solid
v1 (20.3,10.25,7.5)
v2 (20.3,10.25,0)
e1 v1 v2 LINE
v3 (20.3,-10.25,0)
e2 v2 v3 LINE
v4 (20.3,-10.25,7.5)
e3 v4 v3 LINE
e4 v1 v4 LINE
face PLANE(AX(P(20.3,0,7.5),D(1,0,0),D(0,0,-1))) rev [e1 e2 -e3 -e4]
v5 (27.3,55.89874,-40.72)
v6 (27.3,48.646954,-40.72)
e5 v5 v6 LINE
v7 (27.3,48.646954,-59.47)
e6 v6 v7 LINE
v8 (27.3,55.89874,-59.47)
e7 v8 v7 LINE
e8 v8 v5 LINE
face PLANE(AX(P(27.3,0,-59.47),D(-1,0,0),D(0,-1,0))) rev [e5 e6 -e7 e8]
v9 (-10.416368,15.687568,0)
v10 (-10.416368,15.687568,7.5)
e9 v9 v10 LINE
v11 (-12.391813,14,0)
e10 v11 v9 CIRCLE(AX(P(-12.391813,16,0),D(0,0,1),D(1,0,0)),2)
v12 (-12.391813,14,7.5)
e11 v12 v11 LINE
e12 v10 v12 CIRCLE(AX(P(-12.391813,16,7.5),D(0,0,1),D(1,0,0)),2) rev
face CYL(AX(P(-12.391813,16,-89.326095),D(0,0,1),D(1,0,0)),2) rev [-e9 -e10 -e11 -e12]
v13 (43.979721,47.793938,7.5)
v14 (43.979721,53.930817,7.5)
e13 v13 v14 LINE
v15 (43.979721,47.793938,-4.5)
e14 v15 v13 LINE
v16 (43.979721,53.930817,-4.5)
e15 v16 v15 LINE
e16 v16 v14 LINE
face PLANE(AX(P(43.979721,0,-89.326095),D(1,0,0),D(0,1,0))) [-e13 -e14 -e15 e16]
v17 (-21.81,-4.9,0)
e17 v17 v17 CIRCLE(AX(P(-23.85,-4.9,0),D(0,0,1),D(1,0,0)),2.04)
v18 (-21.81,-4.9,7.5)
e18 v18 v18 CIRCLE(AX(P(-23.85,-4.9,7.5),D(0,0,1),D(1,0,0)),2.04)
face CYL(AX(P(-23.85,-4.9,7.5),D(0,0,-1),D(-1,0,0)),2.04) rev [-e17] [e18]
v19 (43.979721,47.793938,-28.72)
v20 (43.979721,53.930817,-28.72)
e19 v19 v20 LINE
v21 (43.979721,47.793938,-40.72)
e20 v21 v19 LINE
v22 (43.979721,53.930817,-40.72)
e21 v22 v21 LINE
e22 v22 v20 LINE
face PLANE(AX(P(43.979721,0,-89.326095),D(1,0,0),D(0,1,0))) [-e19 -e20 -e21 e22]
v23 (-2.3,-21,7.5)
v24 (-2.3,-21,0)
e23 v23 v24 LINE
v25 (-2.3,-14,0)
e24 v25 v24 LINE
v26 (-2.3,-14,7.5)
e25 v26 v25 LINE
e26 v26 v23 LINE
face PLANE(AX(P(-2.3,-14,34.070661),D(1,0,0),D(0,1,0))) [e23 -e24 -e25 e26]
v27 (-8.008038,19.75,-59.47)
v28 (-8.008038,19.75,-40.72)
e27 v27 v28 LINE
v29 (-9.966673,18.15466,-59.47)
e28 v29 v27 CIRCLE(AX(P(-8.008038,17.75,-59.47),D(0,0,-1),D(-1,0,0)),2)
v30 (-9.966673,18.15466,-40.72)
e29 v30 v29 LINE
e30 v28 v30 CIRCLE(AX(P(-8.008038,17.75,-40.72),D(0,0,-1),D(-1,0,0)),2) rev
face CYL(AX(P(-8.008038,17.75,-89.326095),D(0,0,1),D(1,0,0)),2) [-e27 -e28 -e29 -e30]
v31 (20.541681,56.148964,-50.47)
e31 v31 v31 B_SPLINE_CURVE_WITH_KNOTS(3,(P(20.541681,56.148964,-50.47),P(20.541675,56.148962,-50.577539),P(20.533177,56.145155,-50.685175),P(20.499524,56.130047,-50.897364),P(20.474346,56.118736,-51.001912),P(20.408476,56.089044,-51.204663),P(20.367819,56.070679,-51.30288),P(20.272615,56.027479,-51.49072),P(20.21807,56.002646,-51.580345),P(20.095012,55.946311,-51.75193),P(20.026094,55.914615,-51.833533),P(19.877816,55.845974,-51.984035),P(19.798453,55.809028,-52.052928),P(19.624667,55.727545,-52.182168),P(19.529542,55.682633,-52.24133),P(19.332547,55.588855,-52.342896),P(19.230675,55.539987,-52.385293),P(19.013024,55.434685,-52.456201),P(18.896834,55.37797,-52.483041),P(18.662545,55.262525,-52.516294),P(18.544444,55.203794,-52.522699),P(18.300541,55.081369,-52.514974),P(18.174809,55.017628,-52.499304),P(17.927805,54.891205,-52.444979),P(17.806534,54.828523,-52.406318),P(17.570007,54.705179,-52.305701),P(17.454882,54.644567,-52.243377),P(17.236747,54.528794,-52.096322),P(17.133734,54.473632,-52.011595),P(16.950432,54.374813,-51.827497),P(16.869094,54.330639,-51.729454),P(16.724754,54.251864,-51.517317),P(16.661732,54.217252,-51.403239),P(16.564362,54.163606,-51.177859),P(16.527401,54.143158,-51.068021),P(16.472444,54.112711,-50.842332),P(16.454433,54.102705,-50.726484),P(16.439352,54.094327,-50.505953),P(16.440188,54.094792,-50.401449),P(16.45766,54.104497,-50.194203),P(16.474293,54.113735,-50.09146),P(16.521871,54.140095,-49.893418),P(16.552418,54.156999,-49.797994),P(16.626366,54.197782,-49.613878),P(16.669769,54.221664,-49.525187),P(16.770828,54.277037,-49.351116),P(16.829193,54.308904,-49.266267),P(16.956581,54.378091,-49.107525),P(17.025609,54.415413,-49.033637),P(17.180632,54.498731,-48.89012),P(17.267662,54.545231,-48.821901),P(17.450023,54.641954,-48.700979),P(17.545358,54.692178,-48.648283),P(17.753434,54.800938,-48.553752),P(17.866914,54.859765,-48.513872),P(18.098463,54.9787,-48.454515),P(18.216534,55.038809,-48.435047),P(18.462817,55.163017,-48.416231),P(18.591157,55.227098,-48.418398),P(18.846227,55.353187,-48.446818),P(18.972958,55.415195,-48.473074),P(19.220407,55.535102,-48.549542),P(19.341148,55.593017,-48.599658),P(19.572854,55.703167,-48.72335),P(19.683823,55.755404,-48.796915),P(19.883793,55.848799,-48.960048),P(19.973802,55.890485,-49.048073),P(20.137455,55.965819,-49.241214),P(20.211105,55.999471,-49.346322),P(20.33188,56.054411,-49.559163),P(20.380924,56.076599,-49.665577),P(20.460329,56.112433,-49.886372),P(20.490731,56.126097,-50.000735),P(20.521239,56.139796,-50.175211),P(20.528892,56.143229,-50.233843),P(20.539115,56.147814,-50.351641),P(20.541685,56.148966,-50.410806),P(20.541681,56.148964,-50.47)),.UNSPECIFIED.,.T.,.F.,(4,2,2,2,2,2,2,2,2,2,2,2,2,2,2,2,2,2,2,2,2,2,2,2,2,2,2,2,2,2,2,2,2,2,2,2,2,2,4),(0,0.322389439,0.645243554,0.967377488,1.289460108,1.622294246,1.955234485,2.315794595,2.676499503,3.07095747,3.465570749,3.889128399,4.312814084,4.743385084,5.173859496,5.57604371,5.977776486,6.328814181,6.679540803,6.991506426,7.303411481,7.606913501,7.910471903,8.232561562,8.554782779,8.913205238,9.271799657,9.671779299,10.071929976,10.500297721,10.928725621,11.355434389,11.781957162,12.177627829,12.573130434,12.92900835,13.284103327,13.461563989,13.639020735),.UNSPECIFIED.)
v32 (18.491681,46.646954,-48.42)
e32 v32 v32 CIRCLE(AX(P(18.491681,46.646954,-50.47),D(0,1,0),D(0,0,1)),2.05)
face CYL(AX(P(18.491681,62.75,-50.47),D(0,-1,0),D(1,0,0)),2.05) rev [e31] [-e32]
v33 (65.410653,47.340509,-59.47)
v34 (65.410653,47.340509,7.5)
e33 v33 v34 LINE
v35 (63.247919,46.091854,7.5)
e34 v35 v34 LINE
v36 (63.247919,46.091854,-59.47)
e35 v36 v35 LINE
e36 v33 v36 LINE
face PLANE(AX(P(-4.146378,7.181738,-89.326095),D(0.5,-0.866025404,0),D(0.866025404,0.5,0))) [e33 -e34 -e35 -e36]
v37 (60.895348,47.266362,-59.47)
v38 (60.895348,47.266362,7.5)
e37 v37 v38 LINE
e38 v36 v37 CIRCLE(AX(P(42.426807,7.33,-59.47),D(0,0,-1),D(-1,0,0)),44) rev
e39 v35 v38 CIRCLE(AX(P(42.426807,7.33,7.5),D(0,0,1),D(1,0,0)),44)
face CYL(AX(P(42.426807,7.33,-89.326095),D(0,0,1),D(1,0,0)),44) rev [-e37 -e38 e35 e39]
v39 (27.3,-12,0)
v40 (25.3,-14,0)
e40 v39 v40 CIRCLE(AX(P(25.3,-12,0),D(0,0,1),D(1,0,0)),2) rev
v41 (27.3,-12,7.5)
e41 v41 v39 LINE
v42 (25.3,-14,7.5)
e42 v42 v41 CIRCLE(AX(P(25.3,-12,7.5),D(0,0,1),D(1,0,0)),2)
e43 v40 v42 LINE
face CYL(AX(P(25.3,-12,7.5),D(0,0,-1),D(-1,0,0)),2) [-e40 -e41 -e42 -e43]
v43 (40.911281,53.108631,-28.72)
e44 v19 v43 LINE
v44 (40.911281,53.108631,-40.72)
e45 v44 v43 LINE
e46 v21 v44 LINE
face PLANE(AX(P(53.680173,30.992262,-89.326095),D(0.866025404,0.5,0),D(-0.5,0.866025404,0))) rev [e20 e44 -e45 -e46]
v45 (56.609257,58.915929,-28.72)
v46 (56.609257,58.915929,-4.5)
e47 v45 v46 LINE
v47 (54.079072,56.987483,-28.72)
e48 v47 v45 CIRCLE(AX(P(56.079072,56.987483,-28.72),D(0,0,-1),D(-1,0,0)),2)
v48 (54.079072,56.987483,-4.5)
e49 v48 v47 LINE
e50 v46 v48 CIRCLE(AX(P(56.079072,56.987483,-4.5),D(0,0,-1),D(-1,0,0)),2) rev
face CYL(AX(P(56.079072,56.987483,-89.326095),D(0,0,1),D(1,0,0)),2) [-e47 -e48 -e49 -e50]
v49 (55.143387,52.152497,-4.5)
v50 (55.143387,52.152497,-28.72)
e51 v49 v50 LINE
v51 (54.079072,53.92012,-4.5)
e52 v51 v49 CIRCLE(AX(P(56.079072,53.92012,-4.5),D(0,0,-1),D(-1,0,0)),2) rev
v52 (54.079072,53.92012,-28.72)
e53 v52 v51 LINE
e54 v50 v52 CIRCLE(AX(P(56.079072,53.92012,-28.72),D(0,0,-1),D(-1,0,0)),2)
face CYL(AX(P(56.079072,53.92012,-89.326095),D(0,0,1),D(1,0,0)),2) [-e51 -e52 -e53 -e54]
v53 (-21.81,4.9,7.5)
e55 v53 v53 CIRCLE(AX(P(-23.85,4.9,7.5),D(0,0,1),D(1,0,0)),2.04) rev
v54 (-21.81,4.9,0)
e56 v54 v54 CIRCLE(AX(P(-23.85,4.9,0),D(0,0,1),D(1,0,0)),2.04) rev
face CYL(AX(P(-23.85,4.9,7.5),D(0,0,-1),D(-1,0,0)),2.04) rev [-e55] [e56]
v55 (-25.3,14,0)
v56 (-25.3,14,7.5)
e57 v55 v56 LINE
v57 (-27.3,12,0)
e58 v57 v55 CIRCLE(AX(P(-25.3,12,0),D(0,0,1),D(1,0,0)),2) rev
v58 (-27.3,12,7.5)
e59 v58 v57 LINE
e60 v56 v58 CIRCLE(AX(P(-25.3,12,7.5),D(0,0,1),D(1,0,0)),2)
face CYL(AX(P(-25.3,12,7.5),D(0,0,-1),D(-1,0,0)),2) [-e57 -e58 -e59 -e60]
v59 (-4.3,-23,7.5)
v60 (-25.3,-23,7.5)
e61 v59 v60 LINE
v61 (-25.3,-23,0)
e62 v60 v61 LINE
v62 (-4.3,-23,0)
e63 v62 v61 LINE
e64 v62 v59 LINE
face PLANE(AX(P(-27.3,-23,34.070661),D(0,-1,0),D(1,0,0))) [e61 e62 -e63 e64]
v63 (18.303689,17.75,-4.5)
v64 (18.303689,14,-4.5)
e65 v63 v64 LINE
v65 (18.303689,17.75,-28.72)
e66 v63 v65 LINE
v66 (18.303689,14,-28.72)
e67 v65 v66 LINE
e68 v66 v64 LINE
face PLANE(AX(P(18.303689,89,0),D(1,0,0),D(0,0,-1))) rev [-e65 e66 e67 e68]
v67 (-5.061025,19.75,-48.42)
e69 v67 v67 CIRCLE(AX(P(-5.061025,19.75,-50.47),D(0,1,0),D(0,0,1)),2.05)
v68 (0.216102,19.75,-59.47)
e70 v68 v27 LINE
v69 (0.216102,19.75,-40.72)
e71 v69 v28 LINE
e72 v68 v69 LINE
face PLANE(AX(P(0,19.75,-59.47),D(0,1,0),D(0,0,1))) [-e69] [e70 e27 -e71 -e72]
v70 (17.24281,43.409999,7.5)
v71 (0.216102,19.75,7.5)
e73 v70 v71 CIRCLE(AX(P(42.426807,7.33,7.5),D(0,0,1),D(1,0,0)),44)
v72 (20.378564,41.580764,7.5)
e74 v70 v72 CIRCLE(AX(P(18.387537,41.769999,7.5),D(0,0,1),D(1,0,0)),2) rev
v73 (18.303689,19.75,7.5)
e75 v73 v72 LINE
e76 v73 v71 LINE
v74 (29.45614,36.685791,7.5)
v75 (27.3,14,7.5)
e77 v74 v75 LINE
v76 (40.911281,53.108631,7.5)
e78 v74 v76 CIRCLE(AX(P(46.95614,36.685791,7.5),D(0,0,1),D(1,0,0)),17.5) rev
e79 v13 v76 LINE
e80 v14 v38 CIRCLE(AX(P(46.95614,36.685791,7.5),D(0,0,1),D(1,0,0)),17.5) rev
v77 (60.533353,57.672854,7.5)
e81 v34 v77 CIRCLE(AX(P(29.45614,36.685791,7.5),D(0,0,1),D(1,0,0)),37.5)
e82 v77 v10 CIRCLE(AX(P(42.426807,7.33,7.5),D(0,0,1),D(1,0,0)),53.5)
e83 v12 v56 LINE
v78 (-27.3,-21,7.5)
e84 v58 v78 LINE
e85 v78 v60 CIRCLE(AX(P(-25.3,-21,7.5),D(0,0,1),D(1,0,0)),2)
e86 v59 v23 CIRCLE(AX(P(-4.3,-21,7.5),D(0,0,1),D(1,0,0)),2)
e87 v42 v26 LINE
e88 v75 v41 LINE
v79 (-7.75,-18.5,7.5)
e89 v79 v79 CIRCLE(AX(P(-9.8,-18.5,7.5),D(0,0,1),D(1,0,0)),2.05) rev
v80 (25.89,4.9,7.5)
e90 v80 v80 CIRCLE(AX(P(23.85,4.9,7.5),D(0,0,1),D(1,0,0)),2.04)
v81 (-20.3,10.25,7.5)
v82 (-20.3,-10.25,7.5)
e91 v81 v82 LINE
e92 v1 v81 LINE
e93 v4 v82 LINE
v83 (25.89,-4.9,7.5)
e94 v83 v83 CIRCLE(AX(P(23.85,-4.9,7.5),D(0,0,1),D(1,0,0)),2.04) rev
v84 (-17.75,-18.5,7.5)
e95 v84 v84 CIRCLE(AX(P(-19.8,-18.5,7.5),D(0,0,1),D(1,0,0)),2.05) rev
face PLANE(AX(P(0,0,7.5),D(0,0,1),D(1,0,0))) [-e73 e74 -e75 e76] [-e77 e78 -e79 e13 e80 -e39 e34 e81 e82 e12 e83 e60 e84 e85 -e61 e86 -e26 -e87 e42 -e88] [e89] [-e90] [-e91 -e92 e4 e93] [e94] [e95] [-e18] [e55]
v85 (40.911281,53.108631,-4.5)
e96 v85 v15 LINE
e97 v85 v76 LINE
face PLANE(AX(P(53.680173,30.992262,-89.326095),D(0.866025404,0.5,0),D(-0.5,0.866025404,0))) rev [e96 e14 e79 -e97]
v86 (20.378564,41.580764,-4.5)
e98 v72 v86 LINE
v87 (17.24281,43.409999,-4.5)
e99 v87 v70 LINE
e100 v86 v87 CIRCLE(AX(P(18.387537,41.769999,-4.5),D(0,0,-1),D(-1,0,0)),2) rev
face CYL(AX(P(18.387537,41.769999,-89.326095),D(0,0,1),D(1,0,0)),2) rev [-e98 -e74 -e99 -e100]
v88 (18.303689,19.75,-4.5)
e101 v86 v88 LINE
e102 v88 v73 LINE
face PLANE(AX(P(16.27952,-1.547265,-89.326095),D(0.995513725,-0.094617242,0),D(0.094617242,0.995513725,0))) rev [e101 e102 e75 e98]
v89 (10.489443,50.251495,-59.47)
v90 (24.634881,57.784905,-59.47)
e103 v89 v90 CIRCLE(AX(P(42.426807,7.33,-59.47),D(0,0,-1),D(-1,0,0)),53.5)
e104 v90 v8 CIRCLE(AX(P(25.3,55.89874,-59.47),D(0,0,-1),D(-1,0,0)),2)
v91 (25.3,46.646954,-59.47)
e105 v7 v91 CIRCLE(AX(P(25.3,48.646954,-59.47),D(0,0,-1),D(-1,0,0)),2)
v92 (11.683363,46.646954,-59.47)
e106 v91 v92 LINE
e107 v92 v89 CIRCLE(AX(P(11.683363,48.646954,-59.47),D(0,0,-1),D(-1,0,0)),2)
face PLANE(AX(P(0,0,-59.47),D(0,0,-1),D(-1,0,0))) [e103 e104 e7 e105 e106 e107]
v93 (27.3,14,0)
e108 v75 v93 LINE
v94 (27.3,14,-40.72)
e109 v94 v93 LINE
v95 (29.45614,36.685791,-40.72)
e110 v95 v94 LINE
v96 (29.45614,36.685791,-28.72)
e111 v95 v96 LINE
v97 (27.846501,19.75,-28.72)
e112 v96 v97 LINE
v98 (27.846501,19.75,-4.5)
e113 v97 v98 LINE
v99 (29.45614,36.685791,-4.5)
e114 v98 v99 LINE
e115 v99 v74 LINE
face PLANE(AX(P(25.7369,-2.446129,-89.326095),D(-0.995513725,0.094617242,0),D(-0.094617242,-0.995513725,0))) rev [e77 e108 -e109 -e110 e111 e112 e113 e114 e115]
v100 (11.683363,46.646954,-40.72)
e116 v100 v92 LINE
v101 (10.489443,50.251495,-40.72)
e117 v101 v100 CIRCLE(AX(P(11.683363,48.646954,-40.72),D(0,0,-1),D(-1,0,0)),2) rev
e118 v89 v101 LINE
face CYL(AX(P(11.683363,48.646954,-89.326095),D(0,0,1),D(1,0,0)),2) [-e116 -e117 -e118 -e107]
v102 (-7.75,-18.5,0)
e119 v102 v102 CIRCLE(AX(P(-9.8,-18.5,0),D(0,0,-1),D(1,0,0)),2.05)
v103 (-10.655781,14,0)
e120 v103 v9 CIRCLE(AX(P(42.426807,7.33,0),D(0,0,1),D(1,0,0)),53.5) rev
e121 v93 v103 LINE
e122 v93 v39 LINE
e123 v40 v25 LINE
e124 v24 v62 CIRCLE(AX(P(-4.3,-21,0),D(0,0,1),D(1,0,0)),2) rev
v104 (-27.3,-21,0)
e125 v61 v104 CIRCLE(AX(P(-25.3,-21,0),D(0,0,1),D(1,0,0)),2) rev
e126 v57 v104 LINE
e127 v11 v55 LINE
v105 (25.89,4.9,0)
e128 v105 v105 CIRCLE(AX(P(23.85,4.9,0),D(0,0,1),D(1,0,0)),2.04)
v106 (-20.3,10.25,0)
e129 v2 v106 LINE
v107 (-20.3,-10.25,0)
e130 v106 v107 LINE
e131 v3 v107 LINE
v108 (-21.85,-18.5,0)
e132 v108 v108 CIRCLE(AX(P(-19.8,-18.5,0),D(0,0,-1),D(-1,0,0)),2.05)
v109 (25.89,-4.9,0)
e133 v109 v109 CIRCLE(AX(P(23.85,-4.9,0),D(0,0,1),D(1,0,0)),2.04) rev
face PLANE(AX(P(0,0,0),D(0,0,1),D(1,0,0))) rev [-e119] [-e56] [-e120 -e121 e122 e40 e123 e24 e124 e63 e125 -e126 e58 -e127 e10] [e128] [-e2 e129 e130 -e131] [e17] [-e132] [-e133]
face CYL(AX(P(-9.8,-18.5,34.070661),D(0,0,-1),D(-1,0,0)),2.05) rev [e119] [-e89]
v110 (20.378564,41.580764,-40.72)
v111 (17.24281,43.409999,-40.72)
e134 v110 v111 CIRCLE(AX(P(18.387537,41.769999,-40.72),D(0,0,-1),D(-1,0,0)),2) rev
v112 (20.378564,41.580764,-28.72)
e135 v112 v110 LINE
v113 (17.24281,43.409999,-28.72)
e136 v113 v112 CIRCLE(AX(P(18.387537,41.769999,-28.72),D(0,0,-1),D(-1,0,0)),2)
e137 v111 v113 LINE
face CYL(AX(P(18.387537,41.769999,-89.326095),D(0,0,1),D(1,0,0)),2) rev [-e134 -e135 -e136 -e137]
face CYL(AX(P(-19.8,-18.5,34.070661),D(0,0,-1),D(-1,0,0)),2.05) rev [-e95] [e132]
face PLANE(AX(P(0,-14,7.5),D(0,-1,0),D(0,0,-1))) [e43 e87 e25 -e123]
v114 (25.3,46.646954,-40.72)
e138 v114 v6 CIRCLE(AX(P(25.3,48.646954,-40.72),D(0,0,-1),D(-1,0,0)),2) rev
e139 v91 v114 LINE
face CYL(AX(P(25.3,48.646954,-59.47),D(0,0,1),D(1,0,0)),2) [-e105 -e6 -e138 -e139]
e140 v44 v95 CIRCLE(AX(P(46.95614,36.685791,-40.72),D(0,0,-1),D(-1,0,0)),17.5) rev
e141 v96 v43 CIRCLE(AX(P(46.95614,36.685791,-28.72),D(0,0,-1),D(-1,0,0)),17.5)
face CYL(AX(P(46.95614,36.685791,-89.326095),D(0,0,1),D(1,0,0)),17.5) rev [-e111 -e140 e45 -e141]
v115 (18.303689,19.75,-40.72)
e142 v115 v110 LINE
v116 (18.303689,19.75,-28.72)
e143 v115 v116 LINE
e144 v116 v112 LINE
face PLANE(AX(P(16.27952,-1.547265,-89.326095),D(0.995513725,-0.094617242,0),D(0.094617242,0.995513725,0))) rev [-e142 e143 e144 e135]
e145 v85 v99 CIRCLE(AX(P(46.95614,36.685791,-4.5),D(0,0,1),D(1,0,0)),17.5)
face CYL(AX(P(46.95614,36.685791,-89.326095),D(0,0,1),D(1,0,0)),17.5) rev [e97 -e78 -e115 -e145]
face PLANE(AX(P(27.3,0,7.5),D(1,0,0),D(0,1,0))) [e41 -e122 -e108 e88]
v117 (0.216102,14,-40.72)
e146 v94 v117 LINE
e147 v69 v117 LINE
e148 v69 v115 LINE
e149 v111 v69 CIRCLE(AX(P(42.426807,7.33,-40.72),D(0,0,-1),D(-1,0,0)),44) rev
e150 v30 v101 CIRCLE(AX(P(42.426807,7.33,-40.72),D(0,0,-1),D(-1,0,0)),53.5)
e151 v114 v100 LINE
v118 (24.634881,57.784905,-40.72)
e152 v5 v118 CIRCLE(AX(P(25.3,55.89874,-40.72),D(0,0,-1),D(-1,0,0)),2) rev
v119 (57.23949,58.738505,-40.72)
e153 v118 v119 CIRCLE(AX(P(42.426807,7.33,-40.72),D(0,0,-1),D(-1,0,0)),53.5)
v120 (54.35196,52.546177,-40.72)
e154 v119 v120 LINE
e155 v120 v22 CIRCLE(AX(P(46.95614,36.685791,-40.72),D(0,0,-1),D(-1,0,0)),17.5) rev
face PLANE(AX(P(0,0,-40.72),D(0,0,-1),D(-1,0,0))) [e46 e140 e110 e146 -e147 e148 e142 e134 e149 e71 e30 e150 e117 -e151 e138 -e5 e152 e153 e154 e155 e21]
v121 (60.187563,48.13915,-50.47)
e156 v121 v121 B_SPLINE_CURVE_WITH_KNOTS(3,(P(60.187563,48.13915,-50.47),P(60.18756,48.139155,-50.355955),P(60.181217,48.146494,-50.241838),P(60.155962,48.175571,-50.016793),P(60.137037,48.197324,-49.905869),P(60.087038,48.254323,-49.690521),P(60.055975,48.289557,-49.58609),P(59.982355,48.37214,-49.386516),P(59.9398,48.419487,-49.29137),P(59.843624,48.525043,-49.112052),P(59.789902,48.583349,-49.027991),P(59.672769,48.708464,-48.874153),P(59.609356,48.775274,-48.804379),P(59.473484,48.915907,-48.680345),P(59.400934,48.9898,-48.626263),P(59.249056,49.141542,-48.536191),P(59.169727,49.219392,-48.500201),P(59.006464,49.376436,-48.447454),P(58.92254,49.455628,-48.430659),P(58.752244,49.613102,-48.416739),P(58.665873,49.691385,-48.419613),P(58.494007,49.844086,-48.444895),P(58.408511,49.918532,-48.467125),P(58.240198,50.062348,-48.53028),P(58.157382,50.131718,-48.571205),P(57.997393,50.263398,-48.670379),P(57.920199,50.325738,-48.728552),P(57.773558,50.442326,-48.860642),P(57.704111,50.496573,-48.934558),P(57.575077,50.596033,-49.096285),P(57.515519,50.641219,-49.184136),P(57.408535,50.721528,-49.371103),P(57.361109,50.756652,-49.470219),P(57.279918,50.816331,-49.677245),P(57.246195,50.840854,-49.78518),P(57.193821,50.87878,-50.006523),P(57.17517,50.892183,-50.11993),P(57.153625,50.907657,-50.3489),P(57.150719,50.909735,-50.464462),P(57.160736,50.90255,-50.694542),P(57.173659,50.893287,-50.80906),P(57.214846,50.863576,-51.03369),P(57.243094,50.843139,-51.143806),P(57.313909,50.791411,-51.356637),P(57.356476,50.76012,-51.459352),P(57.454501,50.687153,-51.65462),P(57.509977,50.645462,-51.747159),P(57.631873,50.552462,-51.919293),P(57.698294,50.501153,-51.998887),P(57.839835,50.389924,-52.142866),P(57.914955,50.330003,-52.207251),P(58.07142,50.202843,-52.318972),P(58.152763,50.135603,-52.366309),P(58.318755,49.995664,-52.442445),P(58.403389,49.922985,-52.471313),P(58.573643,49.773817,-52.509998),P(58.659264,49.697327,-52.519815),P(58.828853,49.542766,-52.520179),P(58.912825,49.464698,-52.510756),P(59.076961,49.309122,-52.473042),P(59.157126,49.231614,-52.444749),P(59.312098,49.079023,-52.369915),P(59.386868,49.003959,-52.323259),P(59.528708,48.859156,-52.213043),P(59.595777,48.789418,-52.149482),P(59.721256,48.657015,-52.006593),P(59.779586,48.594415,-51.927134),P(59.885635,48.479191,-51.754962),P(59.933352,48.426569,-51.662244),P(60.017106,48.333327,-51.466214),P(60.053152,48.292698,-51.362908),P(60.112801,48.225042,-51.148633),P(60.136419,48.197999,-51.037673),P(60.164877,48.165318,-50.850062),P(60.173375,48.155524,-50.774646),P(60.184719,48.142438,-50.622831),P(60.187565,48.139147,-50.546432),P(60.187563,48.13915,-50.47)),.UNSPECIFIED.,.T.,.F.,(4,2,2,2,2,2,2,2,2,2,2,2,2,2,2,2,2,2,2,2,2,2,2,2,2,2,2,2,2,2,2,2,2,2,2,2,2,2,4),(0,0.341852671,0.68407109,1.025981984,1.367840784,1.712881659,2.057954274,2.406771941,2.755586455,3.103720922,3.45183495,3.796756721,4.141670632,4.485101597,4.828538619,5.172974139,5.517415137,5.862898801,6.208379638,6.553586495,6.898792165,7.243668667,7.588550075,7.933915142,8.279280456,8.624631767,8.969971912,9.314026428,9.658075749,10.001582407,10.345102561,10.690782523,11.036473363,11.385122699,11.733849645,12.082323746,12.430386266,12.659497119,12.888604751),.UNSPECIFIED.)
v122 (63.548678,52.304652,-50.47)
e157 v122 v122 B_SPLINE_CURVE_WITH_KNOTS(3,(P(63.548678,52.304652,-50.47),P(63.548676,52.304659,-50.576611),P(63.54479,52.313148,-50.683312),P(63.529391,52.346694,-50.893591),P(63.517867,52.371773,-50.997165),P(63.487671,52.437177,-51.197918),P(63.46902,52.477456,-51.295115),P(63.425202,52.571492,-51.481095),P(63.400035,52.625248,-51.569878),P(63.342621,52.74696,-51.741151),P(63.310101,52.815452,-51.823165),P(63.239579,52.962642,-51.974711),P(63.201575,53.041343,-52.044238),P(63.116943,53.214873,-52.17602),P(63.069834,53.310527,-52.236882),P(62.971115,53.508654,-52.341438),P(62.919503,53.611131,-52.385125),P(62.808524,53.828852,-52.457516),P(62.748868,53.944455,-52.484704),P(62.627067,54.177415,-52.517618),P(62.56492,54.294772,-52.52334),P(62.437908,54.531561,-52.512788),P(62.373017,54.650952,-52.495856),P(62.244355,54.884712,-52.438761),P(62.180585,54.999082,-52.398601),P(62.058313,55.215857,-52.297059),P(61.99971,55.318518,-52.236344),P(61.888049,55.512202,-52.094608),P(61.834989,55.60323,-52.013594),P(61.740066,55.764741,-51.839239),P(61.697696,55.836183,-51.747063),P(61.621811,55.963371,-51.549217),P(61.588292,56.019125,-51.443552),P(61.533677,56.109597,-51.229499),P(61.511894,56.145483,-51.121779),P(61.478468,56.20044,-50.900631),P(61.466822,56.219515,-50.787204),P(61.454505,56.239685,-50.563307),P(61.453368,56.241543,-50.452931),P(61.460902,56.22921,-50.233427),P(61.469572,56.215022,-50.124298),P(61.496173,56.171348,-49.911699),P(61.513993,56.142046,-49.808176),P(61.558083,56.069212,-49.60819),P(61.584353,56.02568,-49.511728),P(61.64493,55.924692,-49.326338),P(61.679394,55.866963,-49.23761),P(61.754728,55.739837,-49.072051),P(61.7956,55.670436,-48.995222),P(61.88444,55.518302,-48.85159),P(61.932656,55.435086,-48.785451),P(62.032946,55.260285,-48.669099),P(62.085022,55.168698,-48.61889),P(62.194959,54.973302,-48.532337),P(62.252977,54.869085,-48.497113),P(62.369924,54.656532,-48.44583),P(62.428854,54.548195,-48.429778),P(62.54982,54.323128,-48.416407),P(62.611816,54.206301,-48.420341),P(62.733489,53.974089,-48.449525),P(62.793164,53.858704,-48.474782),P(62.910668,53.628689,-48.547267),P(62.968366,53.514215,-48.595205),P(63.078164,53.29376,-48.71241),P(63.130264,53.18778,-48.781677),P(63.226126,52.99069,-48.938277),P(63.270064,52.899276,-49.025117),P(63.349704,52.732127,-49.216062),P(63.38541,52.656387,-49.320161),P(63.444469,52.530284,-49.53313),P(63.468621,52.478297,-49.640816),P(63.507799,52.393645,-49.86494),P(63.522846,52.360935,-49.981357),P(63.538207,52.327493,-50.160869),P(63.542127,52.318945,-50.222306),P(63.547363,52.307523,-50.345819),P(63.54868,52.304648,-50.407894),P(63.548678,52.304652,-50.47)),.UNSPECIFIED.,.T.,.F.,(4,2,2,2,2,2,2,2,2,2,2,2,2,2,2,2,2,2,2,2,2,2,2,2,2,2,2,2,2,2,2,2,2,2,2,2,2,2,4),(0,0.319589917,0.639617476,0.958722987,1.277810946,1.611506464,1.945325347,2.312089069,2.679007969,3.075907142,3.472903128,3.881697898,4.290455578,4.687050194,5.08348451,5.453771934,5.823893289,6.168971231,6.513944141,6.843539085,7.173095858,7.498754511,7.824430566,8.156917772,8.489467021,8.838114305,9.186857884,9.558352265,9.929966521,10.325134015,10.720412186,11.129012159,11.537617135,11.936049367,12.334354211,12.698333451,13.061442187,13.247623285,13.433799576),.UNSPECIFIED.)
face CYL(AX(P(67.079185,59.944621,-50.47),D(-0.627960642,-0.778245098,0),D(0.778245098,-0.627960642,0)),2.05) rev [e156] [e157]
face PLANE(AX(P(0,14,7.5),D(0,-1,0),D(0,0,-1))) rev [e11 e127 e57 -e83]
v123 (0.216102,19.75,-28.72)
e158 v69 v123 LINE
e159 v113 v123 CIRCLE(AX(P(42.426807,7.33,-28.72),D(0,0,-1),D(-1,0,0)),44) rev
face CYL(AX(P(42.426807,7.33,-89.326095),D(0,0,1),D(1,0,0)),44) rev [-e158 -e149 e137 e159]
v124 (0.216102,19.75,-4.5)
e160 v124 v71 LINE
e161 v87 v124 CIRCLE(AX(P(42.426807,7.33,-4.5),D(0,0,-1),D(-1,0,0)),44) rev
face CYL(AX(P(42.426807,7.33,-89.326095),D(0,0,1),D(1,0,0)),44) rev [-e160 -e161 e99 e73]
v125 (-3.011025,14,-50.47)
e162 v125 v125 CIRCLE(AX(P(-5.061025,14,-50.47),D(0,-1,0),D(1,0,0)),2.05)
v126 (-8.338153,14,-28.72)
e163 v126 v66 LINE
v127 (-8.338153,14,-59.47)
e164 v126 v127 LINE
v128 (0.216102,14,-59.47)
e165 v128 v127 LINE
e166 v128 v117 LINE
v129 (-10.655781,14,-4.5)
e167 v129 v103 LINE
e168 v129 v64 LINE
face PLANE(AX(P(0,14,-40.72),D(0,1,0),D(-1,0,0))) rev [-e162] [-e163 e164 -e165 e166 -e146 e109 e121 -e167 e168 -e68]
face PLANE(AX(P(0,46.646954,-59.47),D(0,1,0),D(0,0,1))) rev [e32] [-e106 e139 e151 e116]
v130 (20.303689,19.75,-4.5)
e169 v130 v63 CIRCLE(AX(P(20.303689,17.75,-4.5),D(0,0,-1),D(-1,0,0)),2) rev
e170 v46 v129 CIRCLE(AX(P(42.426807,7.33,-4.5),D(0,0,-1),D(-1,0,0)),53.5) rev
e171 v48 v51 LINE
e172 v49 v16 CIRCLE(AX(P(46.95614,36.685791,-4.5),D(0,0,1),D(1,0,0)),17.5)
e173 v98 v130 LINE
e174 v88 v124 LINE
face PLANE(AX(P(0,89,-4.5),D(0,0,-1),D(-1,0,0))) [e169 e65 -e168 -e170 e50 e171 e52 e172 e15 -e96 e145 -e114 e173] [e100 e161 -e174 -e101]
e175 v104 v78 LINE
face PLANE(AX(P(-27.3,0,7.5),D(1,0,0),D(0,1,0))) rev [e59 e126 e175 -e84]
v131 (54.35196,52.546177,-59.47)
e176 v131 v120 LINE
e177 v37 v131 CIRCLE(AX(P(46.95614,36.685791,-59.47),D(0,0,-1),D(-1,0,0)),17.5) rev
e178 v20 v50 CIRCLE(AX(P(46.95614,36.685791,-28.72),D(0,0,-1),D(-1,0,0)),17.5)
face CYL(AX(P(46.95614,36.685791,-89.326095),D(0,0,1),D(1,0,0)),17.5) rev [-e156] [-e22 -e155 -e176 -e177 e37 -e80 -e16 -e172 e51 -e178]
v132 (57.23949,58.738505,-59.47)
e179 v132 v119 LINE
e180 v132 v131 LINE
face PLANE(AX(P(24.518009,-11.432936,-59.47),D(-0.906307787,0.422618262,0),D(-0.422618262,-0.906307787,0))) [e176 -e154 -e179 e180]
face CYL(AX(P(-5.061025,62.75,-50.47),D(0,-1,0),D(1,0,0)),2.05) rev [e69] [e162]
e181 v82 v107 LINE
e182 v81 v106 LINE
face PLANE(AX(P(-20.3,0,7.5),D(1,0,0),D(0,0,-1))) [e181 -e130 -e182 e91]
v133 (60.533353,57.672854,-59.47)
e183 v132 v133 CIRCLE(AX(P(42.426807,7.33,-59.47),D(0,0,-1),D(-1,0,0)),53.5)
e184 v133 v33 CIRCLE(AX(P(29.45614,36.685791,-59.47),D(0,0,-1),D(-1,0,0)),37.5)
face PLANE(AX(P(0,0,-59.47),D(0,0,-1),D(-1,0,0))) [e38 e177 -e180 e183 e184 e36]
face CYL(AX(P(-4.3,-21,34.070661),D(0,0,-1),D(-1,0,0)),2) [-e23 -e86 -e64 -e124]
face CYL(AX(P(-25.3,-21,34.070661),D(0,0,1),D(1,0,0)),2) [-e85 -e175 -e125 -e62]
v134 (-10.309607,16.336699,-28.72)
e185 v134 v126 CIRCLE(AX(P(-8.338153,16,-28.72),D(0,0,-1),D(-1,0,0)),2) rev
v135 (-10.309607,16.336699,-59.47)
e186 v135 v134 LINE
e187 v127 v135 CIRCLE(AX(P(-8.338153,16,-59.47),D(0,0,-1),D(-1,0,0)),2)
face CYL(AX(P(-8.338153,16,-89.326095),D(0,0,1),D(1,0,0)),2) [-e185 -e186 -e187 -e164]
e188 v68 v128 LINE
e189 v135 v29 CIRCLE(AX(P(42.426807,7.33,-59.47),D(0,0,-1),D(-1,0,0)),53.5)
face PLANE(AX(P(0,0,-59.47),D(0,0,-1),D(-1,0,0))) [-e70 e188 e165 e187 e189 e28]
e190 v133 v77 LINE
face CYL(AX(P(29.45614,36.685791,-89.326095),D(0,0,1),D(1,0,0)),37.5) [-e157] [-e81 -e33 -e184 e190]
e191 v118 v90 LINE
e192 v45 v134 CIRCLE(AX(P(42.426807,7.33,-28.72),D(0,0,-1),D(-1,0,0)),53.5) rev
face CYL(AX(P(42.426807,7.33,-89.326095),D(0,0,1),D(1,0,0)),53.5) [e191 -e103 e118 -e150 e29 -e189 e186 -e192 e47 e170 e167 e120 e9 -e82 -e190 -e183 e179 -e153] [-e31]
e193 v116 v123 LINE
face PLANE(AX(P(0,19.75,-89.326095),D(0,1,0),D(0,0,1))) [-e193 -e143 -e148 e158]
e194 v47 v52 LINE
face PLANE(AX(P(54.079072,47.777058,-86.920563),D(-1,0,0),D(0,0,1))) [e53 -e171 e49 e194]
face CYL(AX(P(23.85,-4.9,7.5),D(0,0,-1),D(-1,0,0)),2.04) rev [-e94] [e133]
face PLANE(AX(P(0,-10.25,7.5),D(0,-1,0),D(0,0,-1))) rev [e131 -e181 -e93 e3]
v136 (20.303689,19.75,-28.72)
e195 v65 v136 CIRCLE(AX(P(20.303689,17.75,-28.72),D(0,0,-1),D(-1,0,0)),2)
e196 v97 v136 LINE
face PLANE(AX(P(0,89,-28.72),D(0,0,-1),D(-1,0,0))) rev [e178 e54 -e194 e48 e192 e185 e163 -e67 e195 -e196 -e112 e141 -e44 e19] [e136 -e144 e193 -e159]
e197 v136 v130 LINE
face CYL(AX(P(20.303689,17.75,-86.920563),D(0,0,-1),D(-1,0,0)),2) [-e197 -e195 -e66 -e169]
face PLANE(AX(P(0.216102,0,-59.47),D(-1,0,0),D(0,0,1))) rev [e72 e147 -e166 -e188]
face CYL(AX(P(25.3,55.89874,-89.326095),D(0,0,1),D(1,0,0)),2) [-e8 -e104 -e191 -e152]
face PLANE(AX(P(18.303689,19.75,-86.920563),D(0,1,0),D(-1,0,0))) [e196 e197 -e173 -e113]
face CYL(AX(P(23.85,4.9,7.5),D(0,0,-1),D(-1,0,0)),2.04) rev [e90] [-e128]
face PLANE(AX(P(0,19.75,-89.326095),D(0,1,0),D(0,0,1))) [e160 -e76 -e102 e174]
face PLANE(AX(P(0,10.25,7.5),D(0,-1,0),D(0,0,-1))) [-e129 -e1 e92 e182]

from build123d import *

# Parameters (mm, degrees)
SKETCH2_W           = 54.6
SKETCH2_H           = 28
SKETCH2_R           = 2.04
SKETCH2_W_2         = 40.6
SKETCH2_H_2         = 20.5
BOSS_EXTRUDE1_DEPTH = 7.5
BOSS_EXTRUDE2_DEPTH = 7.5
BOSS_EXTRUDE3_DEPTH = 40.72
SKETCH6_W           = 18.087587328
SKETCH6_H           = 12.11
SKETCH6_W_2         = 10.871882737
CUT_EXTRUDE2_DEPTH  = 75
CUT_EXTRUDE3_DEPTH  = 24.22
FILLET2_START       = -28.72
FILLET2_DEPTH       = 24.22
FILLET2_START_2     = -3.36744
FILLET2_2_DEPTH     = 11.36744
FILLET2_START_3     = -40.72
FILLET2_3_DEPTH     = 12
FILLET2_START_4     = -4.5
FILLET2_4_DEPTH     = 12
FILLET3_R           = 2
SKETCH8_W           = 25
SKETCH8_H           = 9
SKETCH8_R           = 2.05
BOSS_EXTRUDE4_DEPTH = 7.5
BOSS_EXTRUDE5_DEPTH = 18.75
FILLET5_START       = -59.47
FILLET5_DEPTH       = 18.75
FILLET5_START_2     = -40.72
FILLET5_2_DEPTH     = 12
FILLET5_START_3     = -28.72
FILLET5_3_DEPTH     = 36.72
SKETCH10_R          = 2.05
CUT_EXTRUDE4_DEPTH  = 48.75
SKETCH11_R          = 2.05
CUT_EXTRUDE5_DEPTH  = 13.75


with BuildPart() as part:
    # Sketch2 → Boss-Extrude1 (new body)
    with BuildSketch(Plane.XY):
        Rectangle(SKETCH2_W, SKETCH2_H)
        with Locations((23.85, 4.9)):
            Circle(SKETCH2_R, mode=Mode.SUBTRACT)
        with Locations((23.85, -4.9)):
            Circle(SKETCH2_R, mode=Mode.SUBTRACT)
        with Locations((-23.85, -4.9)):
            Circle(SKETCH2_R, mode=Mode.SUBTRACT)
        with Locations((-23.85, 4.9)):
            Circle(SKETCH2_R, mode=Mode.SUBTRACT)
        Rectangle(SKETCH2_W_2, SKETCH2_H_2, mode=Mode.SUBTRACT)
    extrude(amount=BOSS_EXTRUDE1_DEPTH)

    # Sketch3 → Boss-Extrude2 (add)
    with BuildSketch(Plane.XY.offset(7.5)):
        with BuildLine():
            ThreePointArc((60.895347856, 47.266361721), (62.080408935, 46.696685397), (63.247918809, 46.091853548))
            Line((63.247918809, 46.091853548), (65.410652729, 47.340508558))
            ThreePointArc((65.410652729, 47.340508558), (63.367825291, 52.693526286), (60.533352794, 57.672854393))
            ThreePointArc((60.533352794, 57.672854393), (14.45073797, 52.932517239), (-10.655780842, 14))
            Line((-10.655780842, 14), (27.3, 14))
            Line((27.3, 14), (29.456139987, 36.685790659))
            ThreePointArc((29.456139987, 36.685790659), (31.415329504, 44.731485751), (36.854221074, 50.975690388))
            ThreePointArc((36.854221074, 50.975690388), (38.81261709, 52.175562601), (40.911281353, 53.108630977))
            Line((40.911281353, 53.108630977), (43.979720969, 47.793937662))
            Line((43.979720969, 47.793937662), (43.979720969, 53.930816894))
            ThreePointArc((43.979720969, 53.930816894), (53.370921787, 52.967700083), (60.895347856, 47.266361721))
        make_face()
        with BuildLine():
            ThreePointArc((0.216101895, 19.75), (7.968248239, 34.690697157), (20.76316619, 45.627345599))
            Line((20.76316619, 45.627345599), (18.303689223, 19.75))
            Line((18.303689223, 19.75), (0.216101895, 19.75))
        make_face(mode=Mode.SUBTRACT)
    extrude(amount=-BOSS_EXTRUDE2_DEPTH)

    # Sketch4 → Boss-Extrude3 (add)
    with BuildSketch(Plane(origin=(0, 0, 0), x_dir=(-1, 0, 0), z_dir=(0, 0, -1))):
        with BuildLine():
            Line((-27.3, 14), (10.655780842, 14))
            ThreePointArc((10.655780842, 14), (-14.45073797, 52.932517239), (-60.533352794, 57.672854393))
            ThreePointArc((-60.533352794, 57.672854393), (-63.367825291, 52.693526286), (-65.410652729, 47.340508558))
            Line((-65.410652729, 47.340508558), (-63.247918809, 46.091853548))
            ThreePointArc((-63.247918809, 46.091853548), (-62.080408935, 46.696685397), (-60.895347856, 47.266361721))
            ThreePointArc((-60.895347856, 47.266361721), (-53.370921787, 52.967700083), (-43.979720969, 53.930816894))
            Line((-43.979720969, 53.930816894), (-43.979720969, 47.793937662))
            Line((-43.979720969, 47.793937662), (-40.911281353, 53.108630977))
            ThreePointArc((-40.911281353, 53.108630977), (-32.60282981, 46.697408258), (-29.456139987, 36.685790659))
            Line((-29.456139987, 36.685790659), (-27.3, 14))
        make_face()
        with BuildLine():
            ThreePointArc((-20.76316619, 45.627345599), (-7.968248239, 34.690697157), (-0.216101895, 19.75))
            Line((-0.216101895, 19.75), (-18.303689223, 19.75))
            Line((-18.303689223, 19.75), (-20.76316619, 45.627345599))
        make_face(mode=Mode.SUBTRACT)
    extrude(amount=BOSS_EXTRUDE3_DEPTH)

    # Sketch6 → Cut-Extrude2 (cut)
    with BuildSketch(Plane.XZ.offset(-14)):
        with Locations((9.259895559, -22.665)):
            Rectangle(SKETCH6_W, SKETCH6_H)
        with Locations((9.259895559, -10.555)):
            Rectangle(SKETCH6_W, SKETCH6_H)
        with Locations((-5.219839474, -10.555)):
            Rectangle(SKETCH6_W_2, SKETCH6_H)
        with Locations((-5.219839474, -22.665)):
            Rectangle(SKETCH6_W_2, SKETCH6_H)
    extrude(amount=-CUT_EXTRUDE2_DEPTH, mode=Mode.SUBTRACT)

    # Sketch7 → Cut-Extrude3 (cut)
    with BuildSketch(Plane(origin=(0, 0, -4.5), x_dir=(-1, 0, 0), z_dir=(0, 0, -1))):
        Polygon((-18.303689223, 19.75), (-27.846500896, 19.75), (-54.079071881, 47.777058416), (-54.079071881, 65.656726539), (-18.303689223, 62.002487799), align=None)
    extrude(amount=CUT_EXTRUDE3_DEPTH, mode=Mode.SUBTRACT)

    # Fillet2: read off the stored shape, not the designer's step
    # Fillet2 outline → Fillet2 (cut)
    with BuildSketch(Plane.XY.offset(FILLET2_START)):
        with BuildLine():
            ThreePointArc((55.143386559, 52.15249663), (54.365687709, 52.888463891), (54.079071881, 53.920120169))
            Line((54.079071881, 53.920120169), (54.079071881, 52.670590979))
            ThreePointArc((54.079071881, 52.670590979), (54.615611027, 52.420545294), (55.143386559, 52.15249663))
        make_face()
        with BuildLine():
            ThreePointArc((56.609256937, 58.915929333), (55.348001268, 59.246208749), (54.079071881, 59.545655852))
            Line((54.079071881, 59.545655852), (54.079071881, 56.987483377))
            ThreePointArc((54.079071881, 56.987483377), (54.866712634, 58.57813892), (56.609256937, 58.915929333))
        make_face()
        with BuildLine():
            Line((18.303689223, 19.75), (18.303689223, 17.75))
            ThreePointArc((18.303689223, 17.75), (18.88947566, 19.164213562), (20.303689223, 19.75))
            Line((20.303689223, 19.75), (18.303689223, 19.75))
        make_face()
    extrude(amount=FILLET2_DEPTH, mode=Mode.SUBTRACT)

    # Fillet2 2 outline → Fillet2 2 (cut)
    with BuildSketch(Plane.XY.offset(FILLET2_START_2)):
        with BuildLine():
            Line((-27.3, 14), (-27.3, 12))
            ThreePointArc((-27.3, 12), (-26.714213562, 13.414213562), (-25.3, 14))
            Line((-25.3, 14), (-27.3, 14))
        make_face()
        with BuildLine():
            ThreePointArc((27.3, -12), (26.714213562, -13.414213562), (25.3, -14))
            Line((25.3, -14), (27.3, -14))
            Line((27.3, -14), (27.3, -12))
        make_face()
    extrude(amount=FILLET2_2_DEPTH, mode=Mode.SUBTRACT)

    # Fillet2 3 outline → Fillet2 3 (add)
    with BuildSketch(Plane.XY.offset(FILLET2_START_3)):
        with BuildLine():
            ThreePointArc((17.242809806, 43.409998621), (19.395297177, 43.497545876), (20.378564388, 41.5807642))
            Line((20.378564388, 41.5807642), (20.76316619, 45.627345599))
            ThreePointArc((20.76316619, 45.627345599), (18.976765346, 44.560304331), (17.242809806, 43.409998621))
        make_face()
    extrude(amount=FILLET2_3_DEPTH)

    # Fillet2 4 outline → Fillet2 4 (add)
    with BuildSketch(Plane.XY.offset(FILLET2_START_4)):
        with BuildLine():
            ThreePointArc((17.242809806, 43.409998621), (19.395297177, 43.497545876), (20.378564388, 41.5807642))
            Line((20.378564388, 41.5807642), (20.76316619, 45.627345599))
            ThreePointArc((20.76316619, 45.627345599), (18.976765346, 44.560304331), (17.242809806, 43.409998621))
        make_face()
    extrude(amount=FILLET2_4_DEPTH)

    # Fillet3
    fillet3_edges = [part.edges().sort_by_distance(p)[0] for p in [
        (-10.655780842, 14, 3.75),
    ]]
    fillet(fillet3_edges, radius=FILLET3_R)

    # Sketch8 → Boss-Extrude4 (add)
    with BuildSketch(Plane(origin=(0, 0, 0), x_dir=(-1, 0, 0), z_dir=(0, 0, -1))):
        with Locations((14.8, -18.5)):
            Rectangle(SKETCH8_W, SKETCH8_H)
        with Locations((19.8, -18.5)):
            Circle(SKETCH8_R, mode=Mode.SUBTRACT)
        with Locations(Location((9.8, -18.5, 0), (0, 0, 180))):
            Circle(SKETCH8_R, mode=Mode.SUBTRACT)
    extrude(amount=-BOSS_EXTRUDE4_DEPTH)

    # Sketch9 → Boss-Extrude5 (add)
    with BuildSketch(Plane(origin=(0, 0, -40.72), x_dir=(-1, 0, 0), z_dir=(0, 0, -1))):
        with BuildLine():
            Line((9.611579134, 19.75), (-0.216101895, 19.75))
            Line((-0.216101895, 19.75), (-0.216101895, 14))
            Line((-0.216101895, 14), (10.655780842, 14))
            ThreePointArc((10.655780842, 14), (10.212250908, 16.889268502), (9.611579134, 19.75))
        make_face()
        with BuildLine():
            Line((-27.3, 46.646953525), (-6.144205282, 46.646953525))
            ThreePointArc((-6.144205282, 46.646953525), (-16.03112882, 53.865128552), (-27.3, 58.646953525))
            Line((-27.3, 58.646953525), (-27.3, 46.646953525))
        make_face()
        with BuildLine():
            Line((-54.351959568, 52.546176932), (-57.239489727, 58.738505342))
            ThreePointArc((-57.239489727, 58.738505342), (-58.895043232, 58.232329863), (-60.533352794, 57.672854393))
            ThreePointArc((-60.533352794, 57.672854393), (-63.367825291, 52.693526286), (-65.410652729, 47.340508558))
            Line((-65.410652729, 47.340508558), (-63.247918809, 46.091853548))
            ThreePointArc((-63.247918809, 46.091853548), (-62.080408935, 46.696685397), (-60.895347856, 47.266361721))
            ThreePointArc((-60.895347856, 47.266361721), (-57.945451214, 50.305079876), (-54.351959568, 52.546176932))
        make_face()
    extrude(amount=BOSS_EXTRUDE5_DEPTH)

    # Fillet5: read off the stored shape, not the designer's step
    # Fillet5 outline → Fillet5 (cut)
    with BuildSketch(Plane.XY.offset(FILLET5_START)):
        with BuildLine():
            ThreePointArc((-8.338152673, 14), (-9.866779191, 14.710309738), (-10.309607406, 16.336699029))
            ThreePointArc((-10.309607406, 16.336699029), (-10.49559232, 15.170260335), (-10.655780842, 14))
            Line((-10.655780842, 14), (-8.338152673, 14))
        make_face()
        with BuildLine():
            ThreePointArc((10.489442502, 50.25149541), (8.269243735, 48.506581845), (6.144205282, 46.646953525))
            Line((6.144205282, 46.646953525), (11.683362659, 46.646953525))
            ThreePointArc((11.683362659, 46.646953525), (9.784799548, 48.018098919), (10.489442502, 50.25149541))
        make_face()
        with BuildLine():
            ThreePointArc((-9.96667316, 18.154660194), (-9.271106016, 19.30069668), (-8.008038399, 19.75))
            Line((-8.008038399, 19.75), (-9.611579134, 19.75))
            ThreePointArc((-9.611579134, 19.75), (-9.795218542, 18.953686155), (-9.96667316, 18.154660194))
        make_face()
        with BuildLine():
            ThreePointArc((27.3, 58.646953525), (25.961797954, 58.233374024), (24.634881293, 57.784904523))
            ThreePointArc((24.634881293, 57.784904523), (26.45537063, 57.531258997), (27.3, 55.898739868))
            Line((27.3, 55.898739868), (27.3, 58.646953525))
        make_face()
        with BuildLine():
            ThreePointArc((27.3, 48.646953525), (26.714213562, 47.232739963), (25.3, 46.646953525))
            Line((25.3, 46.646953525), (27.3, 46.646953525))
            Line((27.3, 46.646953525), (27.3, 48.646953525))
        make_face()
    extrude(amount=FILLET5_DEPTH, mode=Mode.SUBTRACT)

    # Fillet5 2 outline → Fillet5 2 (cut)
    with BuildSketch(Plane.XY.offset(FILLET5_START_2)):
        with BuildLine():
            ThreePointArc((-8.338152673, 14), (-9.866779191, 14.710309738), (-10.309607406, 16.336699029))
            ThreePointArc((-10.309607406, 16.336699029), (-10.49559232, 15.170260335), (-10.655780842, 14))
            Line((-10.655780842, 14), (-8.338152673, 14))
        make_face()
    extrude(amount=FILLET5_2_DEPTH, mode=Mode.SUBTRACT)

    # Fillet5 3 outline → Fillet5 3 (cut)
    with BuildSketch(Plane.XY.offset(FILLET5_START_3)):
        with BuildLine():
            Line((-2.3, -23), (-2.3, -21))
            ThreePointArc((-2.3, -21), (-2.885786438, -22.414213562), (-4.3, -23))
            Line((-4.3, -23), (-2.3, -23))
        make_face()
        with BuildLine():
            Line((-27.3, -23), (-25.3, -23))
            ThreePointArc((-25.3, -23), (-26.714213562, -22.414213562), (-27.3, -21))
            Line((-27.3, -21), (-27.3, -23))
        make_face()
    extrude(amount=FILLET5_3_DEPTH, mode=Mode.SUBTRACT)

    # Sketch10 → Cut-Extrude4 (cut)
    with BuildSketch(Plane.XZ.offset(-14)):
        with Locations((-5.061025389, -50.47)):
            Circle(SKETCH10_R)
        with Locations((18.491681329, -50.47)):
            Circle(SKETCH10_R)
    extrude(amount=-CUT_EXTRUDE4_DEPTH, mode=Mode.SUBTRACT)

    # Sketch11 → Cut-Extrude5 (cut)
    with BuildSketch(Plane(origin=(47.112556242, 58.387601913, 0), x_dir=(-0.7782450980918282, 0.6279606415182729, 0), z_dir=(-0.6279606415182729, -0.7782450980918282, 0))):
        with Locations(Location((-14.561184245, 50.47, 0), (0, 0, 180))):
            Circle(SKETCH11_R)
    extrude(amount=-CUT_EXTRUDE5_DEPTH, mode=Mode.SUBTRACT)


solid = part.part
